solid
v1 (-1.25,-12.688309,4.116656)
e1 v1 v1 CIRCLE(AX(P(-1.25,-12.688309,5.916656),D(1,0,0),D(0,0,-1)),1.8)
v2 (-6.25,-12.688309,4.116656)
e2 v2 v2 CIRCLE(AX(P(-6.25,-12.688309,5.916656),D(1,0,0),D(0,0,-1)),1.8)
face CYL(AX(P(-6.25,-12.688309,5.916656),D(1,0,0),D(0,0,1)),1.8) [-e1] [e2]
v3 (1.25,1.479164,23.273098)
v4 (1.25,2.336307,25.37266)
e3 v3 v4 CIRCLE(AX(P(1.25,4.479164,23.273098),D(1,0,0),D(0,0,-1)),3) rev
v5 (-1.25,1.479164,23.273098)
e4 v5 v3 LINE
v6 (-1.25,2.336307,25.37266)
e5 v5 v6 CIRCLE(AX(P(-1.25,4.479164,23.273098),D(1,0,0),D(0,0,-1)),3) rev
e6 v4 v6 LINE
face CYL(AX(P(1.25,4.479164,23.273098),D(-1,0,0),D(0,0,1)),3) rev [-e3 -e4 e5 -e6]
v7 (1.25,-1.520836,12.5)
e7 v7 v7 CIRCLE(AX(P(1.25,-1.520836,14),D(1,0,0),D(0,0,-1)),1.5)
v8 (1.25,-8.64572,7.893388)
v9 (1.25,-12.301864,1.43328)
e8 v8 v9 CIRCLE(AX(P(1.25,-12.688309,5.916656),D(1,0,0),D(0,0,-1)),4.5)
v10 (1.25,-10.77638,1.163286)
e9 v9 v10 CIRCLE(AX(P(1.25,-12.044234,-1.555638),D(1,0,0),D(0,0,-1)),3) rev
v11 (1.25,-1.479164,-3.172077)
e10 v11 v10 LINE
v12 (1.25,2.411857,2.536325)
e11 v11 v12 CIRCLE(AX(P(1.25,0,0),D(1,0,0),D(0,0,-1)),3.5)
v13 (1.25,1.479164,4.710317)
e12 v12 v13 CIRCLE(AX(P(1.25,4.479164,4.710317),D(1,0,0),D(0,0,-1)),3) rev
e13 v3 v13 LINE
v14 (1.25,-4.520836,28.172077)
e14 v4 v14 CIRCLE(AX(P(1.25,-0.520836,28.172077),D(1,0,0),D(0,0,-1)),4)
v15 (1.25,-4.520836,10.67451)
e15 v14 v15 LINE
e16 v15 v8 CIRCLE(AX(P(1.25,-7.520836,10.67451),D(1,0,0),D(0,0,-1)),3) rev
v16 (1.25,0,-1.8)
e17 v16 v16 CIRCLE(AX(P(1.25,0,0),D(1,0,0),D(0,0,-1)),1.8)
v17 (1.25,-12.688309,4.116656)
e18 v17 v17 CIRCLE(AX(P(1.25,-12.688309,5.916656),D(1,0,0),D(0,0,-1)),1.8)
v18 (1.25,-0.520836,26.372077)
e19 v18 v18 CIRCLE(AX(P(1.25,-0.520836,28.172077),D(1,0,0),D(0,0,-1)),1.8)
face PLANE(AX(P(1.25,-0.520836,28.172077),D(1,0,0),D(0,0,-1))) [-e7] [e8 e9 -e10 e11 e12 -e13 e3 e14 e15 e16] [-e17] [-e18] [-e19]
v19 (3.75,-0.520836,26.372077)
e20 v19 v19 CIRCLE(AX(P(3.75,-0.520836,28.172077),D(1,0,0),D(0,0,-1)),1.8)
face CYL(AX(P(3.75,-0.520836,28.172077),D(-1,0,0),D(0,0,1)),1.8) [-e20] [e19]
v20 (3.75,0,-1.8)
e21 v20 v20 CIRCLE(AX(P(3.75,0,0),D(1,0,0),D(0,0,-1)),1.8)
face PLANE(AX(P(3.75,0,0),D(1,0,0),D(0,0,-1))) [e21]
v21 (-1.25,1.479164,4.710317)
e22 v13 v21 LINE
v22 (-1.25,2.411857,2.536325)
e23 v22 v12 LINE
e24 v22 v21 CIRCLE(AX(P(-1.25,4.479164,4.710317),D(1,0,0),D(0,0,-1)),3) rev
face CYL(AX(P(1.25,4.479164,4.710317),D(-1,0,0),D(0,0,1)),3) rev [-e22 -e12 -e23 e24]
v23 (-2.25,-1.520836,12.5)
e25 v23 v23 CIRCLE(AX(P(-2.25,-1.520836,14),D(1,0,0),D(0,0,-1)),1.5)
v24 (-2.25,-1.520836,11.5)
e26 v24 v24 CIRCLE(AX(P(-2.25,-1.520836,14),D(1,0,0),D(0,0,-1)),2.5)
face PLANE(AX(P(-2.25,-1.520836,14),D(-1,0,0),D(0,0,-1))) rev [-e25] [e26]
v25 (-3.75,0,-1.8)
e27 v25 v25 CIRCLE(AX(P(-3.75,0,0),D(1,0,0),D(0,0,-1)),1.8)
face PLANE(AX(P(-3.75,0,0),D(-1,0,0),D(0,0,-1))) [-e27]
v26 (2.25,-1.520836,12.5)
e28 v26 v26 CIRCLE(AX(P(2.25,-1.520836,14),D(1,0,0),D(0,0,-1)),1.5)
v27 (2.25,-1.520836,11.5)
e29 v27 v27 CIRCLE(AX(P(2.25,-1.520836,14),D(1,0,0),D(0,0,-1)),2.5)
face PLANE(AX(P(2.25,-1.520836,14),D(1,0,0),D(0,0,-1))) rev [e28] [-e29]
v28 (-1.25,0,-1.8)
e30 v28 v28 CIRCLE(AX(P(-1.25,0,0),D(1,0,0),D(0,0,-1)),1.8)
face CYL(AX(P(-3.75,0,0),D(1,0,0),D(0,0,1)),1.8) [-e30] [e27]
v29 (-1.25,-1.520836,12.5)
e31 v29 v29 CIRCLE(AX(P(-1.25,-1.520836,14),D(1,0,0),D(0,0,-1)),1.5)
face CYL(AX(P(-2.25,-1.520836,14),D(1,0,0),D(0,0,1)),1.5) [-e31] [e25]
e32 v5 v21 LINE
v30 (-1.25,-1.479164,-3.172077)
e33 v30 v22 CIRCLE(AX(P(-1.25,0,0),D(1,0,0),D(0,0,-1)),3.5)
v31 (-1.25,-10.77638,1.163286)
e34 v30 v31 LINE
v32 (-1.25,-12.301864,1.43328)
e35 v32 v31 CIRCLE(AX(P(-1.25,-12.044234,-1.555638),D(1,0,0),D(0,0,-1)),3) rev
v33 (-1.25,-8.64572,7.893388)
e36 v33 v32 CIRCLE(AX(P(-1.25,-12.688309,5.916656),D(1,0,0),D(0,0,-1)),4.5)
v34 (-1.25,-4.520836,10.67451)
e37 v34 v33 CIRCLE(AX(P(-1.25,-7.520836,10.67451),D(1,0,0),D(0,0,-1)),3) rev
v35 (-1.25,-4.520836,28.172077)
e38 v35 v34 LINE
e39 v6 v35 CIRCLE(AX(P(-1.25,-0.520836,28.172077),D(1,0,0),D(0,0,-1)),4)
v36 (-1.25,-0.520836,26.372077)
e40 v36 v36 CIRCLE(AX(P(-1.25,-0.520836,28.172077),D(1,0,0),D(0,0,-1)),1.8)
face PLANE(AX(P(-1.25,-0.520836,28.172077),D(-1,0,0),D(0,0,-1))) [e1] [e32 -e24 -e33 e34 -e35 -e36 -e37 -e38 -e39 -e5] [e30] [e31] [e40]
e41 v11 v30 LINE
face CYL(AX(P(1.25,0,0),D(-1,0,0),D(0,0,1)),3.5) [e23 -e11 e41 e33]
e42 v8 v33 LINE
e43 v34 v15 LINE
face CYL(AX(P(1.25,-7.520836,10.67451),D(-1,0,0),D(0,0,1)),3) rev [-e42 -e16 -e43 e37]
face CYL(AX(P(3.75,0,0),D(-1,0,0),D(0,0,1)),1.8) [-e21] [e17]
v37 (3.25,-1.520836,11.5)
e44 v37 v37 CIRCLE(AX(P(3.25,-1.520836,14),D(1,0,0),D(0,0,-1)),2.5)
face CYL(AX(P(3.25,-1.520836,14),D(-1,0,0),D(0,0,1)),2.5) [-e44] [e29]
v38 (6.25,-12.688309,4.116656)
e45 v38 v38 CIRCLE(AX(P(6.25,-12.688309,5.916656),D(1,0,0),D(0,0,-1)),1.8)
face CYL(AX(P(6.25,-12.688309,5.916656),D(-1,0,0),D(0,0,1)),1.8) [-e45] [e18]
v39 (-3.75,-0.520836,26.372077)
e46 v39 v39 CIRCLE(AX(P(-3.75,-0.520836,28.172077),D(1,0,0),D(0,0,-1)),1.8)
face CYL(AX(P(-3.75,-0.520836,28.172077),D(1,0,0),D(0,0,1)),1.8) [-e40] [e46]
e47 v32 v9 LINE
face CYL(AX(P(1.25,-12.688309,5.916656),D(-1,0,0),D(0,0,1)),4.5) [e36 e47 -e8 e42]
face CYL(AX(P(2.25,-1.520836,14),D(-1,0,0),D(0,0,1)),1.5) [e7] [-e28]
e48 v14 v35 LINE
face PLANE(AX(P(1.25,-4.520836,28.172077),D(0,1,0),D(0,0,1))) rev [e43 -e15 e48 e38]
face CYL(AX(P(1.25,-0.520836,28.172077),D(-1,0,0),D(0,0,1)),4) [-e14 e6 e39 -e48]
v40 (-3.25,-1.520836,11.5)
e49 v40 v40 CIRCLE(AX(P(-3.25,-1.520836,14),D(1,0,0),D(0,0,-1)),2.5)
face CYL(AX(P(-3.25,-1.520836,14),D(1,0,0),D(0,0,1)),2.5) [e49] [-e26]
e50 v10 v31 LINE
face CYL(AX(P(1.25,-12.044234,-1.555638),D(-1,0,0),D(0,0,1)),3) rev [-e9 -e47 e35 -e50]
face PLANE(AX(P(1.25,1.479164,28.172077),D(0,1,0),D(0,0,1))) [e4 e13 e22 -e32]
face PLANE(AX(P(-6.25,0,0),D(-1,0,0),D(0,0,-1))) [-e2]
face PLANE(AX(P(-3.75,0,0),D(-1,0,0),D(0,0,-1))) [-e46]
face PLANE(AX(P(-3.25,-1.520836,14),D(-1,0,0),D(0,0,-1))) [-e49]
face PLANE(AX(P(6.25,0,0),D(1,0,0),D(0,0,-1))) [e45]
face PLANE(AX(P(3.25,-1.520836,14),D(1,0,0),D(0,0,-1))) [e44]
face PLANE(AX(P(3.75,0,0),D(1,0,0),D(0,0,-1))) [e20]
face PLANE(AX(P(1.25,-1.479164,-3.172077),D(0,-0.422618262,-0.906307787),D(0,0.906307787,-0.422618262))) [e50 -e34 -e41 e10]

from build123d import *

# Parameters (mm, degrees)
EXTRUDE_1_DEPTH     = 1.25
SKETCH_1_3_R        = 2
CUT_EXTRUDE_1_DEPTH = 37.497164572
FILLET_1_R          = 3
EXTRUDE_START       = -1.25
SKETCH_2_R          = 2
EXTRUDE_2_DEPTH     = 1.25
SKETCH_2_5_R        = 1.8
EXTRUDE_5_DEPTH     = 2.5
SKETCH_2_7_R        = 1.8
EXTRUDE_7_DEPTH     = 5
EXTRUDE_8_DEPTH     = 1
EXTRUDE_START_2     = 1
SKETCH_3_3_R        = 2.5
EXTRUDE_9_DEPTH     = 1


with BuildPart() as part:
    # 草图1 → 凸台-拉伸1 (new body)
    with BuildSketch(Plane(origin=(0, 0, 0), x_dir=(0, 0, -1), z_dir=(1, 0, 0))):
        with BuildLine():
            Line((-28.172077255, -4.520836084), (-28.172077255, 1.479163916))
            Line((-28.172077255, 1.479163916), (-24.707975639, 1.479163916))
            ThreePointArc((-24.707975639, 1.479163916), (-31.63617887, 1.479163916), (-28.172077255, -4.520836084))
        make_face()
        with BuildLine():
            Line((-24.707975639, 1.479163916), (-28.172077255, 1.479163916))
            Line((-28.172077255, 1.479163916), (-28.172077255, -4.520836084))
            ThreePointArc((-28.172077255, -4.520836084), (-25.34365013, -3.349263209), (-24.172077255, -0.520836084))
            ThreePointArc((-24.172077255, -0.520836084), (-24.308373949, 0.514440097), (-24.707975639, 1.479163916))
        make_face()
        with BuildLine():
            Line((-3.172077255, 1.479163916), (-24.707975639, 1.479163916))
            ThreePointArc((-24.707975639, 1.479163916), (-24.308373949, 0.514440097), (-24.172077255, -0.520836084))
            ThreePointArc((-24.172077255, -0.520836084), (-25.34365013, -3.349263209), (-28.172077255, -4.520836084))
            Line((-28.172077255, -4.520836084), (-5.969923204, -4.520836084))
            Line((-5.969923204, -4.520836084), (-3.172077255, 1.479163916))
        make_face()
        with BuildLine():
            Line((3.172077255, -1.479163916), (-3.172077255, 1.479163916))
            Line((-3.172077255, 1.479163916), (-3.172077255, -1.479163916))
            ThreePointArc((-3.172077255, -1.479163916), (0, -3.5), (3.172077255, -1.479163916))
        make_face()
        with BuildLine():
            ThreePointArc((3.5, 0), (0.757538649, 3.417036025), (-3.172077255, 1.479163916))
            Line((-3.172077255, 1.479163916), (3.172077255, -1.479163916))
            ThreePointArc((3.172077255, -1.479163916), (3.417036025, -0.757538649), (3.5, 0))
        make_face()
        with BuildLine():
            ThreePointArc((-3.172077255, -1.479163916), (-3.5, 0), (-3.172077255, 1.479163916))
            Line((-3.172077255, 1.479163916), (-5.969923204, -4.520836084))
            Line((-5.969923204, -4.520836084), (-3.172077255, -4.520836084))
            Line((-3.172077255, -4.520836084), (-3.172077255, -1.479163916))
        make_face()
        with BuildLine():
            Line((-3.172077255, -1.479163916), (-3.172077255, 1.479163916))
            ThreePointArc((-3.172077255, 1.479163916), (-3.5, 0), (-3.172077255, -1.479163916))
        make_face()
        with BuildLine():
            Line((-3.172077255, -4.520836084), (-5.969923204, -4.520836084))
            Line((-5.969923204, -4.520836084), (-7.893387964, -8.645719574))
            ThreePointArc((-7.893387964, -8.645719574), (-4.014873487, -8.609923977), (-1.549233455, -11.604047406))
            Line((-1.549233455, -11.604047406), (3.172077255, -1.479163916))
            ThreePointArc((3.172077255, -1.479163916), (0, -3.5), (-3.172077255, -1.479163916))
            Line((-3.172077255, -1.479163916), (-3.172077255, -4.520836084))
        make_face()
        with BuildLine():
            ThreePointArc((-1.549233455, -11.604047406), (-4.014873487, -8.609923977), (-7.893387964, -8.645719574))
            Line((-7.893387964, -8.645719574), (-9.088732919, -11.209145102))
            Line((-9.088732919, -11.209145102), (-2.74457841, -14.167472935))
            Line((-2.74457841, -14.167472935), (-1.549233455, -11.604047406))
        make_face()
        with BuildLine():
            Line((-9.088732919, -11.209145102), (-7.893387964, -8.645719574))
            ThreePointArc((-7.893387964, -8.645719574), (-8.299375187, -16.50572276), (-1.416655664, -12.688309019))
            ThreePointArc((-1.416655664, -12.688309019), (-1.449923081, -12.14214052), (-1.549233455, -11.604047406))
            Line((-1.549233455, -11.604047406), (-2.74457841, -14.167472935))
            Line((-2.74457841, -14.167472935), (-9.088732919, -11.209145102))
        make_face()
    extrude(amount=EXTRUDE_1_DEPTH)

    # 草图1<3> → 切除-拉伸1 (cut, through all)
    with BuildSketch(Plane(origin=(0, 0, 0), x_dir=(0, 0, -1), z_dir=(1, 0, 0))):
        with Locations((-28.172077255, -0.520836084)):
            Circle(SKETCH_1_3_R)
        Circle(SKETCH_1_3_R)
        with Locations((-5.916655664, -12.688309019)):
            Circle(SKETCH_1_3_R)
    extrude(amount=CUT_EXTRUDE_1_DEPTH, mode=Mode.SUBTRACT)

    # 圆角1
    # the kernel refuses this fillet: 3 mm, written as the material it adds along each edge
    with BuildSketch(Plane(origin=(0, -11.604047406, 1.549233455), x_dir=(0, 0.9063077870366663, -0.4226182617406644), z_dir=(1, 0, 0))) as fillet_1_piece_1:
        with BuildLine():
            CenterArc((0.913230262, -3), FILLET_1_R, 90, 29.926434867)
            Line((-0.583432693, -0.4), (-0.613365952, -0.348))
            ThreePointArc((-0.613365952, -0.348), (-0.317772106, -0.161995545), (-0.037712362, 0.046666667))
            Line((-0.037712362, 0.046666667), (0, 0.06))
            Line((0, 0.06), (0.913230262, 0.06))
            Line((0.913230262, 0.06), (0.913230262, 0))
        make_face()
    extrude(amount=1.25)
    with BuildSketch(Plane(origin=(0, 1.479163916, 3.172077255), x_dir=(0, 0, 1), z_dir=(1, 0, 0))) as fillet_1_piece_2:
        with BuildLine():
            CenterArc((1.538240209, -3), FILLET_1_R, 90, 46.440922497)
            Line((-0.635752466, -0.932693577), (-0.67923232, -0.891347449))
            ThreePointArc((-0.67923232, -0.891347449), (-0.329607023, -0.458350724), (-0.054378467, 0.025357096))
            Line((-0.054378467, 0.025357096), (0, 0.06))
            Line((0, 0.06), (1.538240209, 0.06))
            Line((1.538240209, 0.06), (1.538240209, 0))
        make_face()
    extrude(amount=1.25)
    with BuildSketch(Plane(origin=(0, 1.479163916, 24.707975639), x_dir=(0, 0.7902368852402469, 0.6128014892326821), z_dir=(1, 0, 0))) as fillet_1_piece_3:
        with BuildLine():
            CenterArc((1.49141536, -2.972297887), FILLET_1_R, 97.792345701, 44.415308597)
            Line((-0.879295296, -1.133893419), (-0.926709509, -1.09712533))
            Line((-0.926709509, -1.09712533), (-0.047414213, 0.036768089))
            Line((-0.047414213, 0.036768089), (0.008134993, 0.059445958))
            ThreePointArc((0.008134993, 0.059445958), (0.542332858, 0.023063849), (1.076530723, 0.059445958))
            Line((1.076530723, 0.059445958), (1.084665716, 0))
        make_face()
    extrude(amount=1.25)
    with BuildSketch(Plane(origin=(0, -4.520836084, 5.969923204), x_dir=(0, 0, 1), z_dir=(1, 0, 0))) as fillet_1_piece_4:
        with BuildLine():
            CenterArc((4.704586321, 3), FILLET_1_R, 157.978087479, 112.021912521)
            Line((1.923464761, 4.12488349), (1.867842329, 4.14738116))
            ThreePointArc((1.867842329, 4.14738116), (0.907353913, 2.087798841), (-0.054378467, 0.025357096))
            Line((-0.054378467, 0.025357096), (0, -0.06))
            Line((0, -0.06), (4.704586321, -0.06))
            Line((4.704586321, -0.06), (4.704586321, 0))
        make_face()
    extrude(amount=1.25)

    # 草图2 → 凸台-拉伸2 (add)
    with BuildSketch(Plane(origin=(1.25, 0, 0), x_dir=(0, 0, -1), z_dir=(1, 0, 0)).offset(EXTRUDE_START)):
        Circle(SKETCH_2_R)
        with Locations((-5.916655664, -12.688309019)):
            Circle(SKETCH_2_R)
        with Locations((-28.172077255, -0.520836084)):
            Circle(SKETCH_2_R)
    extrude(amount=EXTRUDE_2_DEPTH)

    # 草图2<5> → 凸台-拉伸5 (add)
    with BuildSketch(Plane(origin=(1.25, 0, 0), x_dir=(0, 0, -1), z_dir=(1, 0, 0))):
        with Locations((-28.172077255, -0.520836084)):
            Circle(SKETCH_2_5_R)
        Circle(SKETCH_2_5_R)
    extrude(amount=EXTRUDE_5_DEPTH)

    # 草图2<7> → 凸台-拉伸7 (add)
    with BuildSketch(Plane(origin=(1.25, 0, 0), x_dir=(0, 0, -1), z_dir=(1, 0, 0))):
        with Locations((-5.916655664, -12.688309019)):
            Circle(SKETCH_2_7_R)
    extrude(amount=EXTRUDE_7_DEPTH)

    # 草图3 → 凸台-拉伸8 (add)
    with BuildSketch(Plane(origin=(1.25, 0, 0), x_dir=(0, 0, -1), z_dir=(1, 0, 0))):
        with BuildLine():
            ThreePointArc((-12.5, -1.520836084), (-12.939339828, -0.460175912), (-14, -0.020836084))
            Line((-14, -0.020836084), (-14, -3.020836084))
            ThreePointArc((-14, -3.020836084), (-12.939339828, -2.581496256), (-12.5, -1.520836084))
        make_face()
        with BuildLine():
            Line((-14, -3.020836084), (-14, -0.020836084))
            ThreePointArc((-14, -0.020836084), (-15.5, -1.520836084), (-14, -3.020836084))
        make_face()
    extrude(amount=EXTRUDE_8_DEPTH)

    # 草图3<3> → 凸台-拉伸9 (add)
    with BuildSketch(Plane(origin=(1.25, 0, 0), x_dir=(0, 0, -1), z_dir=(1, 0, 0)).offset(EXTRUDE_START_2)):
        with Locations((-14, -1.520836084)):
            Circle(SKETCH_3_3_R)
    extrude(amount=EXTRUDE_9_DEPTH)

    # 镜向1: part across plane


with BuildPart() as part_1:
    add(part.part)
    add(part.part.mirror(Plane.ZY))


solid = part_1.part
